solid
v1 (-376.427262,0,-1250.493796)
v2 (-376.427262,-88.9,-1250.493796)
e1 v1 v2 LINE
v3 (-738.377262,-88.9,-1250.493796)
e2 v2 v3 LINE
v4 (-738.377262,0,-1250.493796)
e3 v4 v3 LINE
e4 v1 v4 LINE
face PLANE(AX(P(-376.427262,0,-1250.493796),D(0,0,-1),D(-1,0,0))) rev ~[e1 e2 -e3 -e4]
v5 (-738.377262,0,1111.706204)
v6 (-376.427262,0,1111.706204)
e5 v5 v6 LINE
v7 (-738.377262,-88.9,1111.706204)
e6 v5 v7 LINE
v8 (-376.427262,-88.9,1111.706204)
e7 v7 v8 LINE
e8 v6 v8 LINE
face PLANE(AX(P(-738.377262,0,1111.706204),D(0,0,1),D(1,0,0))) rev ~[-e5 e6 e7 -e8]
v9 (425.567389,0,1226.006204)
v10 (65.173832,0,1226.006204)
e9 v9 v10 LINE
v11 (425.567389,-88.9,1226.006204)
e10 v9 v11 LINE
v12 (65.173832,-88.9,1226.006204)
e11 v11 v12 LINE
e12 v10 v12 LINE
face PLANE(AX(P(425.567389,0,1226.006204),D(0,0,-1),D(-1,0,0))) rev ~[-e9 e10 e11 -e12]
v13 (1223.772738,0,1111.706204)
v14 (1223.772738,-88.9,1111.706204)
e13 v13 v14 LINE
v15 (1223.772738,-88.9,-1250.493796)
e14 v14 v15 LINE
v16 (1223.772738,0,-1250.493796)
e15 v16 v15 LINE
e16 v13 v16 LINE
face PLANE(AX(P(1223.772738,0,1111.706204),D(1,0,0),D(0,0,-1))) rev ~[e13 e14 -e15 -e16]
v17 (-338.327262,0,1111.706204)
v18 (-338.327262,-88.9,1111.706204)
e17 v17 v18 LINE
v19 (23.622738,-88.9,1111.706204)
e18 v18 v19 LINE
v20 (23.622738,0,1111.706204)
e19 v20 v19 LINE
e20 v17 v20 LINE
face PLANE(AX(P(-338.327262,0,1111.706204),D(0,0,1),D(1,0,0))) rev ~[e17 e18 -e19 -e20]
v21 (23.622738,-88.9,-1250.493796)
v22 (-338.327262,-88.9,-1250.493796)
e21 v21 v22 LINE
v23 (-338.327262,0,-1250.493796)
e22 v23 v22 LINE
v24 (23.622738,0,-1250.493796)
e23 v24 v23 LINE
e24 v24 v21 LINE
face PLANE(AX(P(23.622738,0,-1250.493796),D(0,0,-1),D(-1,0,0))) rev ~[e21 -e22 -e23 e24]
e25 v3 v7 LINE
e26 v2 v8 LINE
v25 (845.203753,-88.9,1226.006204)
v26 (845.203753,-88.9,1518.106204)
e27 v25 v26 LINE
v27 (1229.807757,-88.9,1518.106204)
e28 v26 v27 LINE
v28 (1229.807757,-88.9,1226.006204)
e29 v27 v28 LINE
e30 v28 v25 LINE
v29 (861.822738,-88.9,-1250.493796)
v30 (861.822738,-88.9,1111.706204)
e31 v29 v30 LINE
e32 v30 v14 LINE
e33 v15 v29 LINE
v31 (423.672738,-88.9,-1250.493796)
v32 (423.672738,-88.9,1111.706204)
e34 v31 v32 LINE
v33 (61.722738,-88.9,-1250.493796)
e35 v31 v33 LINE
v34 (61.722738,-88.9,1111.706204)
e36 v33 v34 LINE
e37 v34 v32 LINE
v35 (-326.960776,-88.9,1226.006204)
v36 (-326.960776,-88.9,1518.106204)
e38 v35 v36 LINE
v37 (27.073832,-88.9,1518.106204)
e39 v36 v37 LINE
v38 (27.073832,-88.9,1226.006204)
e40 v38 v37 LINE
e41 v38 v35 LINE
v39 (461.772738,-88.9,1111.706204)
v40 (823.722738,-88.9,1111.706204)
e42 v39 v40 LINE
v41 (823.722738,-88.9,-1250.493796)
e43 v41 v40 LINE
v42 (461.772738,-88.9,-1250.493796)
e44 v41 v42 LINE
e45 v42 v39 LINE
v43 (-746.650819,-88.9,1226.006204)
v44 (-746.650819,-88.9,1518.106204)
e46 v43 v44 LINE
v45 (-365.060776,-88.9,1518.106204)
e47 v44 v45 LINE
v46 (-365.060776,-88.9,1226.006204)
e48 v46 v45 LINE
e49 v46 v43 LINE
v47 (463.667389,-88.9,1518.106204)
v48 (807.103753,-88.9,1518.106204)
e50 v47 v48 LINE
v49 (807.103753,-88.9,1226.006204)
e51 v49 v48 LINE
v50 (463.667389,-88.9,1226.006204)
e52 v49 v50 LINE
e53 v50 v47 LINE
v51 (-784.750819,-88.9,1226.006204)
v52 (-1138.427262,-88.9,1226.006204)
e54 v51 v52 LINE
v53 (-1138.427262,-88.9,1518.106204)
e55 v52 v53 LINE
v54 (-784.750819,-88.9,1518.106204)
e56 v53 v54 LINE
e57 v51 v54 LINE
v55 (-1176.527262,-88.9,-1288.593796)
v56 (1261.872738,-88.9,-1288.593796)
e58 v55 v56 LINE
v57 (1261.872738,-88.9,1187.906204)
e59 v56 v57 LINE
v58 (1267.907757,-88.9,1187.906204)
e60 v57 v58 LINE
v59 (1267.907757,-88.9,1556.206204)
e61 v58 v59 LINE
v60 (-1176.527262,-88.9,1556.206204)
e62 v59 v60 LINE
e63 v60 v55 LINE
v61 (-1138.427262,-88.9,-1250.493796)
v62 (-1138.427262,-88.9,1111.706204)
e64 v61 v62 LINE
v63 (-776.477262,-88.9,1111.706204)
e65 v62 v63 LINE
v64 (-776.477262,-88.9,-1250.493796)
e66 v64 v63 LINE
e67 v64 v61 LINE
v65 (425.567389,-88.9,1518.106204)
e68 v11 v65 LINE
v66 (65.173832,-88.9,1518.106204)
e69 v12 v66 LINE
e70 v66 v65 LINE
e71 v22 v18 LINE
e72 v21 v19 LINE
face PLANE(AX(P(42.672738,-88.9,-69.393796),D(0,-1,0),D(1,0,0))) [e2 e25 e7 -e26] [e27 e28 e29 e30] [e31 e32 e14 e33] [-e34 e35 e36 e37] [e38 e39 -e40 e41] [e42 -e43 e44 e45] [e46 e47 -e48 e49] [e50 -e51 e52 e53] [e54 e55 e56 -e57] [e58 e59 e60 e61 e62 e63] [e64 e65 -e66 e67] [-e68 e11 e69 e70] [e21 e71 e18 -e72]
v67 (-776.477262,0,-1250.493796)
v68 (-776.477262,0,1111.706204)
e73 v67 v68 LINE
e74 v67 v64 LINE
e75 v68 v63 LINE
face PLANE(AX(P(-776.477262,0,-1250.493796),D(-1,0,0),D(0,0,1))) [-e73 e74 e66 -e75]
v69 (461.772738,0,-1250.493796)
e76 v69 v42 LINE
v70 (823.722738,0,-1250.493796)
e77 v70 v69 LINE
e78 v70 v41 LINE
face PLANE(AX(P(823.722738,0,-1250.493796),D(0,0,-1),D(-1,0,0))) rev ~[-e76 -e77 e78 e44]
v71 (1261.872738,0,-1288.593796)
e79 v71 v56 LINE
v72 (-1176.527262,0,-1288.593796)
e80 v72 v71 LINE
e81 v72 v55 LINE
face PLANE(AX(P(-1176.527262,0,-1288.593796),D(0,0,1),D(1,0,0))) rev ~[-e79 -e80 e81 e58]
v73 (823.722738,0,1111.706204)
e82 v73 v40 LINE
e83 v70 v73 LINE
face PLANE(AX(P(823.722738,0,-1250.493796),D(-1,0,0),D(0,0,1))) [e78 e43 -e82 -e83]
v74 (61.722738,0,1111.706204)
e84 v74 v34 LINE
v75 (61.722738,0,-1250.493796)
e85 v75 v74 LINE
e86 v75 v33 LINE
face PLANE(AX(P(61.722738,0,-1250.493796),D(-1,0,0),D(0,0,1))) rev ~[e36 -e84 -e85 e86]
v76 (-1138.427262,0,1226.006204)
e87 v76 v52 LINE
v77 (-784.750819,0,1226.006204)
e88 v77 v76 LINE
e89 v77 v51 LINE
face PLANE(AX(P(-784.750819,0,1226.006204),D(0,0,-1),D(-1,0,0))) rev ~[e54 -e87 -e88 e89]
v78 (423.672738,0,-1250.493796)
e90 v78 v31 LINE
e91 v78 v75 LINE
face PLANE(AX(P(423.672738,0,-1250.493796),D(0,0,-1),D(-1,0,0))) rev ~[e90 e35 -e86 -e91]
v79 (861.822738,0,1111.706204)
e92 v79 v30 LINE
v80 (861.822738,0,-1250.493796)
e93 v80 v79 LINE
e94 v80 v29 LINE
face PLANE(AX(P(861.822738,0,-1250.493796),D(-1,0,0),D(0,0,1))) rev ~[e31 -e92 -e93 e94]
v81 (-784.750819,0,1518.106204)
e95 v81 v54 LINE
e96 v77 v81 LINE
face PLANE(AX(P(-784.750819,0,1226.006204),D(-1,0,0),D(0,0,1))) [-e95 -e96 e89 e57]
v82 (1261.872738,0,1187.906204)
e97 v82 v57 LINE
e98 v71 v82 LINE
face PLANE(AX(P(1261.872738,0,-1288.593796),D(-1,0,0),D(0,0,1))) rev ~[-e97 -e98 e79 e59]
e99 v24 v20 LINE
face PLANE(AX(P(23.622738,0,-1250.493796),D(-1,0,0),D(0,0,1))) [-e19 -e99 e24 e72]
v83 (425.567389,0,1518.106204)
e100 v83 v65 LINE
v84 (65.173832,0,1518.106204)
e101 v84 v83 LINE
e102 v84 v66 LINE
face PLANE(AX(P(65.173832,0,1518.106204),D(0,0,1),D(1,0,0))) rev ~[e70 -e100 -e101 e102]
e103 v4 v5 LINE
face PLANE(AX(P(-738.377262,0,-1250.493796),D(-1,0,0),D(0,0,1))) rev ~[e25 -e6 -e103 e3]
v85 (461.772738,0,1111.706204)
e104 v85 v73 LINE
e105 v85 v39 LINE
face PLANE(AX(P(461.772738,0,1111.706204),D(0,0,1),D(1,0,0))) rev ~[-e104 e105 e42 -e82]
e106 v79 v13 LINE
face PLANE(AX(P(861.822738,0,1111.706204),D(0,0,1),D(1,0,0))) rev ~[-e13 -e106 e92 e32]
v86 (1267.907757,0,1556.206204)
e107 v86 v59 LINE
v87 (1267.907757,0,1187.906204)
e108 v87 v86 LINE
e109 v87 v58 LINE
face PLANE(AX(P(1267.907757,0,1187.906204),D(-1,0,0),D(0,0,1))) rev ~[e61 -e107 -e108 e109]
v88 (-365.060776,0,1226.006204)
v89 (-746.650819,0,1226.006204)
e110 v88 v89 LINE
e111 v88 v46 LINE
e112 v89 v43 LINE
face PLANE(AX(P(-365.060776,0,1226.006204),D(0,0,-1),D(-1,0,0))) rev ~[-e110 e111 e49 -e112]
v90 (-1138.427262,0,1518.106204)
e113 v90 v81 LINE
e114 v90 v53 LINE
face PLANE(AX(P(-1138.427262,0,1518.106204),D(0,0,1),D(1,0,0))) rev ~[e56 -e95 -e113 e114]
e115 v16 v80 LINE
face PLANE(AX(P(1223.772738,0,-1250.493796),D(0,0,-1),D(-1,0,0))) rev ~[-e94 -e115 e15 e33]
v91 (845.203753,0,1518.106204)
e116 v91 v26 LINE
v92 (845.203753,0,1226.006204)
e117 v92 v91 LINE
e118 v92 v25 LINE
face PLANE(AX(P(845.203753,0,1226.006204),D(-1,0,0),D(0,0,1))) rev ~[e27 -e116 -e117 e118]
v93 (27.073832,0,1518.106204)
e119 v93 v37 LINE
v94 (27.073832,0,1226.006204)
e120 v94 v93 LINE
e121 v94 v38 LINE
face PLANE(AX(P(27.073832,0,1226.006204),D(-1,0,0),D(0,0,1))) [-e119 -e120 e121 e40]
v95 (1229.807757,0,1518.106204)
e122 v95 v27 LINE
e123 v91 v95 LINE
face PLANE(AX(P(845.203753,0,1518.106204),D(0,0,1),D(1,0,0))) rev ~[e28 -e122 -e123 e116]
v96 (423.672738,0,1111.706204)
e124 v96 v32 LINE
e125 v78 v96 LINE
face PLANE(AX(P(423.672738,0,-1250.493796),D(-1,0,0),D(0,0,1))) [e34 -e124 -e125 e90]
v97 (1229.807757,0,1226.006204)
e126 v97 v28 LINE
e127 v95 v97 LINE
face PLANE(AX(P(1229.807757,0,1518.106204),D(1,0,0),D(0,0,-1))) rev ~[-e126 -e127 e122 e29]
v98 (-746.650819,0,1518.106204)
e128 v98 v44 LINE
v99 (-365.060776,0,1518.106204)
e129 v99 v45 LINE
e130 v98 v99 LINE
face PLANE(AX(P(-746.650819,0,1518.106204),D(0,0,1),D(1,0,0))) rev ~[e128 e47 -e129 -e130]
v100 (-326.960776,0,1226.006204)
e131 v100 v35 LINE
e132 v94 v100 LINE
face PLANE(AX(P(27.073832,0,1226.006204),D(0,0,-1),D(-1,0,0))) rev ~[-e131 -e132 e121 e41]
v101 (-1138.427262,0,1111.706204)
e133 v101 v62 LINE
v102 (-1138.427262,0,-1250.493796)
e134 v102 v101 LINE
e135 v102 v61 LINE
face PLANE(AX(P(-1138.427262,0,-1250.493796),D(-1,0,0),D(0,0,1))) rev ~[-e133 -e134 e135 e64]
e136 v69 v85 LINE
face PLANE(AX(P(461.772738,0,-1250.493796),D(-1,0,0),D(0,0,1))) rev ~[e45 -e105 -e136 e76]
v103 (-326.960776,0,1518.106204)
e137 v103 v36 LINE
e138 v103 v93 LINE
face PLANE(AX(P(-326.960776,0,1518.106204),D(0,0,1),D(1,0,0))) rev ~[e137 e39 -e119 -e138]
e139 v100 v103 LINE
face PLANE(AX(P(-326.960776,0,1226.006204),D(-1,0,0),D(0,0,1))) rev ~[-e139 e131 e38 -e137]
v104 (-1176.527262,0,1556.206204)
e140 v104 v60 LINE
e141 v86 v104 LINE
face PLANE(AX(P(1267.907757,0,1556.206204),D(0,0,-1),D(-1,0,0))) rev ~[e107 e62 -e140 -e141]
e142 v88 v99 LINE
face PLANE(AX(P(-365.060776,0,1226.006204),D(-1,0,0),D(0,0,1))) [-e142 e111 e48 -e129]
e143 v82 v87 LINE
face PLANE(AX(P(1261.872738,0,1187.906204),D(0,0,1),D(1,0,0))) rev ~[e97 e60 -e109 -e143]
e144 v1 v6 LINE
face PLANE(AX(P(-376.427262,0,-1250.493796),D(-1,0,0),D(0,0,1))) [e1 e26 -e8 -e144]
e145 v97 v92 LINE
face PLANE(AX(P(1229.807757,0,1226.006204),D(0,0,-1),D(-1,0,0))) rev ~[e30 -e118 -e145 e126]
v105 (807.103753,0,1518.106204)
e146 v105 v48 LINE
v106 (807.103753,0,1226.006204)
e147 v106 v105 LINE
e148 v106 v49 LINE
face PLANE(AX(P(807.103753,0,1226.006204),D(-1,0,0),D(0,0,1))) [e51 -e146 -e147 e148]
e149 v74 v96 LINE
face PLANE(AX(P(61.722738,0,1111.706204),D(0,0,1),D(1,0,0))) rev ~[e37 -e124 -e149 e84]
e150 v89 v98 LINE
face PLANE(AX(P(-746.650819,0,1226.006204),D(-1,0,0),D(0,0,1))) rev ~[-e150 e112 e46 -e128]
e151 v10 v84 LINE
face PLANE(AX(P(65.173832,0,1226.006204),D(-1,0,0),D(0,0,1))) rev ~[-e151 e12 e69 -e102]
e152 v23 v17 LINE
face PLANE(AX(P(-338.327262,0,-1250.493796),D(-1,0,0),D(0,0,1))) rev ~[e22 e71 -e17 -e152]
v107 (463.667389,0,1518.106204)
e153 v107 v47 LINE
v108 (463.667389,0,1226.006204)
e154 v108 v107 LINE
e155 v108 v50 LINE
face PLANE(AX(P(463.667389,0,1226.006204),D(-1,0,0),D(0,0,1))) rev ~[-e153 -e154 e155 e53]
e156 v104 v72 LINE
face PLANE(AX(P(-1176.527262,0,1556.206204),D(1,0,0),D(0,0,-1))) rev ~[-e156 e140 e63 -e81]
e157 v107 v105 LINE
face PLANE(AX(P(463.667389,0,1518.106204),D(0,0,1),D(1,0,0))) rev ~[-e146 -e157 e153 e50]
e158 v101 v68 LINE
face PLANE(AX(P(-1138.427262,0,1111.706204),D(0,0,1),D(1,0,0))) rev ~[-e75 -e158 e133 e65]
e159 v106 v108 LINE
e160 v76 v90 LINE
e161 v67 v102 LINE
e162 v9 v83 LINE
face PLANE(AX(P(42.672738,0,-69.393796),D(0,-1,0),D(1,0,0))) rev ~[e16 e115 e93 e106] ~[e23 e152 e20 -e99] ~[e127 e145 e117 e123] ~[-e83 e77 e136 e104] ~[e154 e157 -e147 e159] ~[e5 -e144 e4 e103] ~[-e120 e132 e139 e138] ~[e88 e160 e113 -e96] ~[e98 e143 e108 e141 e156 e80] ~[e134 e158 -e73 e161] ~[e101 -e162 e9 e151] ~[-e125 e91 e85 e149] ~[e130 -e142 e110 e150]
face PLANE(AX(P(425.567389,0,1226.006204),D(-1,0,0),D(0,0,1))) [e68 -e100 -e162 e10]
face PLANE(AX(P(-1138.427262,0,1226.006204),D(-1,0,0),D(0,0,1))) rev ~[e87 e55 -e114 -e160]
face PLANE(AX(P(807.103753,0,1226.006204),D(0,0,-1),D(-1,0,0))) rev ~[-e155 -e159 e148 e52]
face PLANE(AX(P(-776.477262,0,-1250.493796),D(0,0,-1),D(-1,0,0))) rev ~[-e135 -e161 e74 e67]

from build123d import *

# Parameters (mm, degrees)
F0_W     = 2438.4
F0_H     = 2438.4
F0_W_2   = 38.1
F0_H_2   = 292.1
F0_H_3   = 2362.2
F0_H_4   = 38.1
F1_DEPTH = 88.9


# Not quite as in the source:
# - a feature names something its author has since deleted; it is built from what else it names


with BuildPart() as f1:
    # F0 (on Front) → F1 (new body)
    with BuildSketch(Plane.XZ):
        with Locations((42.6727382223, -69.3937962841)):
            Rectangle(F0_W, F0_H)
        Polygon((-1138.4272617777, -1250.4937962841), (-1138.4272617777, 1111.7062037159), (-776.4772617777, 1111.7062037159), (-738.3772617777, 1111.7062037159), (-376.4272617777, 1111.7062037159), (-338.3272617777, 1111.7062037159), (23.6227382223, 1111.7062037159), (61.7227382223, 1111.7062037159), (423.6727382223, 1111.7062037159), (461.7727382223, 1111.7062037159), (823.7227382223, 1111.7062037159), (861.8227382223, 1111.7062037159), (1175.4527852575, 1111.7062037159), (1223.7727382223, 1111.7062037159), (1223.7727382223, -1250.4937962841), (861.8227382223, -1250.4937962841), (823.7227382223, -1250.4937962841), (461.7727382223, -1250.4937962841), (423.6727382223, -1250.4937962841), (61.7227382223, -1250.4937962841), (23.6227382223, -1250.4937962841), (-338.3272617777, -1250.4937962841), (-376.4272617777, -1250.4937962841), (-738.3772617777, -1250.4937962841), (-776.4772617777, -1250.4937962841), align=None, mode=Mode.SUBTRACT)
        Polygon((-1176.5272617777, 1556.2062037159), (-1176.5272617777, 1187.9062037159), (1261.8727382223, 1187.9062037159), (1267.9077571224, 1187.9062037159), (1267.9077571224, 1556.2062037159), align=None)
        Polygon((-1138.4272617777, 1226.0062037159), (-1138.4272617777, 1518.1062037159), (-784.7508192062, 1518.1062037159), (-746.6508192062, 1518.1062037159), (-365.0607764721, 1518.1062037159), (-326.9607764721, 1518.1062037159), (27.0738322288, 1518.1062037159), (65.1738322288, 1518.1062037159), (425.5673885345, 1518.1062037159), (463.6673885345, 1518.1062037159), (807.1037530899, 1518.1062037159), (845.2037530899, 1518.1062037159), (1229.8077571224, 1518.1062037159), (1229.8077571224, 1226.0062037159), (845.2037530899, 1226.0062037159), (807.1037530899, 1226.0062037159), (463.6673885345, 1226.0062037159), (425.5673885345, 1226.0062037159), (65.1738322288, 1226.0062037159), (27.0738322288, 1226.0062037159), (-326.9607764721, 1226.0062037159), (-365.0607764721, 1226.0062037159), (-746.6508192062, 1226.0062037159), (-784.7508192062, 1226.0062037159), align=None, mode=Mode.SUBTRACT)
        with Locations((-765.7008192062, 1372.0562037159)):
            Rectangle(F0_W_2, F0_H_2)
        with Locations((442.7227382223, -69.3937962841)):
            Rectangle(F0_W_2, F0_H_3)
        with Locations((842.7727382223, -69.3937962841)):
            Rectangle(F0_W_2, F0_H_3)
        with Locations((42.6727382223, 1168.8562037159)):
            Rectangle(F0_W, F0_H_4)
        with Locations((-346.0107764721, 1372.0562037159)):
            Rectangle(F0_W_2, F0_H_2)
        with Locations((-357.3772617777, -69.3937962841)):
            Rectangle(F0_W_2, F0_H_3)
        with Locations((42.6727382223, -69.3937962841)):
            Rectangle(F0_W_2, F0_H_3)
        with Locations((46.1238322288, 1372.0562037159)):
            Rectangle(F0_W_2, F0_H_2)
        with Locations((-757.4272617777, -69.3937962841)):
            Rectangle(F0_W_2, F0_H_3)
        with Locations((444.6173885345, 1372.0562037159)):
            Rectangle(F0_W_2, F0_H_2)
        with Locations((826.1537530899, 1372.0562037159)):
            Rectangle(F0_W_2, F0_H_2)
    extrude(amount=F1_DEPTH)


solid = f1.part
